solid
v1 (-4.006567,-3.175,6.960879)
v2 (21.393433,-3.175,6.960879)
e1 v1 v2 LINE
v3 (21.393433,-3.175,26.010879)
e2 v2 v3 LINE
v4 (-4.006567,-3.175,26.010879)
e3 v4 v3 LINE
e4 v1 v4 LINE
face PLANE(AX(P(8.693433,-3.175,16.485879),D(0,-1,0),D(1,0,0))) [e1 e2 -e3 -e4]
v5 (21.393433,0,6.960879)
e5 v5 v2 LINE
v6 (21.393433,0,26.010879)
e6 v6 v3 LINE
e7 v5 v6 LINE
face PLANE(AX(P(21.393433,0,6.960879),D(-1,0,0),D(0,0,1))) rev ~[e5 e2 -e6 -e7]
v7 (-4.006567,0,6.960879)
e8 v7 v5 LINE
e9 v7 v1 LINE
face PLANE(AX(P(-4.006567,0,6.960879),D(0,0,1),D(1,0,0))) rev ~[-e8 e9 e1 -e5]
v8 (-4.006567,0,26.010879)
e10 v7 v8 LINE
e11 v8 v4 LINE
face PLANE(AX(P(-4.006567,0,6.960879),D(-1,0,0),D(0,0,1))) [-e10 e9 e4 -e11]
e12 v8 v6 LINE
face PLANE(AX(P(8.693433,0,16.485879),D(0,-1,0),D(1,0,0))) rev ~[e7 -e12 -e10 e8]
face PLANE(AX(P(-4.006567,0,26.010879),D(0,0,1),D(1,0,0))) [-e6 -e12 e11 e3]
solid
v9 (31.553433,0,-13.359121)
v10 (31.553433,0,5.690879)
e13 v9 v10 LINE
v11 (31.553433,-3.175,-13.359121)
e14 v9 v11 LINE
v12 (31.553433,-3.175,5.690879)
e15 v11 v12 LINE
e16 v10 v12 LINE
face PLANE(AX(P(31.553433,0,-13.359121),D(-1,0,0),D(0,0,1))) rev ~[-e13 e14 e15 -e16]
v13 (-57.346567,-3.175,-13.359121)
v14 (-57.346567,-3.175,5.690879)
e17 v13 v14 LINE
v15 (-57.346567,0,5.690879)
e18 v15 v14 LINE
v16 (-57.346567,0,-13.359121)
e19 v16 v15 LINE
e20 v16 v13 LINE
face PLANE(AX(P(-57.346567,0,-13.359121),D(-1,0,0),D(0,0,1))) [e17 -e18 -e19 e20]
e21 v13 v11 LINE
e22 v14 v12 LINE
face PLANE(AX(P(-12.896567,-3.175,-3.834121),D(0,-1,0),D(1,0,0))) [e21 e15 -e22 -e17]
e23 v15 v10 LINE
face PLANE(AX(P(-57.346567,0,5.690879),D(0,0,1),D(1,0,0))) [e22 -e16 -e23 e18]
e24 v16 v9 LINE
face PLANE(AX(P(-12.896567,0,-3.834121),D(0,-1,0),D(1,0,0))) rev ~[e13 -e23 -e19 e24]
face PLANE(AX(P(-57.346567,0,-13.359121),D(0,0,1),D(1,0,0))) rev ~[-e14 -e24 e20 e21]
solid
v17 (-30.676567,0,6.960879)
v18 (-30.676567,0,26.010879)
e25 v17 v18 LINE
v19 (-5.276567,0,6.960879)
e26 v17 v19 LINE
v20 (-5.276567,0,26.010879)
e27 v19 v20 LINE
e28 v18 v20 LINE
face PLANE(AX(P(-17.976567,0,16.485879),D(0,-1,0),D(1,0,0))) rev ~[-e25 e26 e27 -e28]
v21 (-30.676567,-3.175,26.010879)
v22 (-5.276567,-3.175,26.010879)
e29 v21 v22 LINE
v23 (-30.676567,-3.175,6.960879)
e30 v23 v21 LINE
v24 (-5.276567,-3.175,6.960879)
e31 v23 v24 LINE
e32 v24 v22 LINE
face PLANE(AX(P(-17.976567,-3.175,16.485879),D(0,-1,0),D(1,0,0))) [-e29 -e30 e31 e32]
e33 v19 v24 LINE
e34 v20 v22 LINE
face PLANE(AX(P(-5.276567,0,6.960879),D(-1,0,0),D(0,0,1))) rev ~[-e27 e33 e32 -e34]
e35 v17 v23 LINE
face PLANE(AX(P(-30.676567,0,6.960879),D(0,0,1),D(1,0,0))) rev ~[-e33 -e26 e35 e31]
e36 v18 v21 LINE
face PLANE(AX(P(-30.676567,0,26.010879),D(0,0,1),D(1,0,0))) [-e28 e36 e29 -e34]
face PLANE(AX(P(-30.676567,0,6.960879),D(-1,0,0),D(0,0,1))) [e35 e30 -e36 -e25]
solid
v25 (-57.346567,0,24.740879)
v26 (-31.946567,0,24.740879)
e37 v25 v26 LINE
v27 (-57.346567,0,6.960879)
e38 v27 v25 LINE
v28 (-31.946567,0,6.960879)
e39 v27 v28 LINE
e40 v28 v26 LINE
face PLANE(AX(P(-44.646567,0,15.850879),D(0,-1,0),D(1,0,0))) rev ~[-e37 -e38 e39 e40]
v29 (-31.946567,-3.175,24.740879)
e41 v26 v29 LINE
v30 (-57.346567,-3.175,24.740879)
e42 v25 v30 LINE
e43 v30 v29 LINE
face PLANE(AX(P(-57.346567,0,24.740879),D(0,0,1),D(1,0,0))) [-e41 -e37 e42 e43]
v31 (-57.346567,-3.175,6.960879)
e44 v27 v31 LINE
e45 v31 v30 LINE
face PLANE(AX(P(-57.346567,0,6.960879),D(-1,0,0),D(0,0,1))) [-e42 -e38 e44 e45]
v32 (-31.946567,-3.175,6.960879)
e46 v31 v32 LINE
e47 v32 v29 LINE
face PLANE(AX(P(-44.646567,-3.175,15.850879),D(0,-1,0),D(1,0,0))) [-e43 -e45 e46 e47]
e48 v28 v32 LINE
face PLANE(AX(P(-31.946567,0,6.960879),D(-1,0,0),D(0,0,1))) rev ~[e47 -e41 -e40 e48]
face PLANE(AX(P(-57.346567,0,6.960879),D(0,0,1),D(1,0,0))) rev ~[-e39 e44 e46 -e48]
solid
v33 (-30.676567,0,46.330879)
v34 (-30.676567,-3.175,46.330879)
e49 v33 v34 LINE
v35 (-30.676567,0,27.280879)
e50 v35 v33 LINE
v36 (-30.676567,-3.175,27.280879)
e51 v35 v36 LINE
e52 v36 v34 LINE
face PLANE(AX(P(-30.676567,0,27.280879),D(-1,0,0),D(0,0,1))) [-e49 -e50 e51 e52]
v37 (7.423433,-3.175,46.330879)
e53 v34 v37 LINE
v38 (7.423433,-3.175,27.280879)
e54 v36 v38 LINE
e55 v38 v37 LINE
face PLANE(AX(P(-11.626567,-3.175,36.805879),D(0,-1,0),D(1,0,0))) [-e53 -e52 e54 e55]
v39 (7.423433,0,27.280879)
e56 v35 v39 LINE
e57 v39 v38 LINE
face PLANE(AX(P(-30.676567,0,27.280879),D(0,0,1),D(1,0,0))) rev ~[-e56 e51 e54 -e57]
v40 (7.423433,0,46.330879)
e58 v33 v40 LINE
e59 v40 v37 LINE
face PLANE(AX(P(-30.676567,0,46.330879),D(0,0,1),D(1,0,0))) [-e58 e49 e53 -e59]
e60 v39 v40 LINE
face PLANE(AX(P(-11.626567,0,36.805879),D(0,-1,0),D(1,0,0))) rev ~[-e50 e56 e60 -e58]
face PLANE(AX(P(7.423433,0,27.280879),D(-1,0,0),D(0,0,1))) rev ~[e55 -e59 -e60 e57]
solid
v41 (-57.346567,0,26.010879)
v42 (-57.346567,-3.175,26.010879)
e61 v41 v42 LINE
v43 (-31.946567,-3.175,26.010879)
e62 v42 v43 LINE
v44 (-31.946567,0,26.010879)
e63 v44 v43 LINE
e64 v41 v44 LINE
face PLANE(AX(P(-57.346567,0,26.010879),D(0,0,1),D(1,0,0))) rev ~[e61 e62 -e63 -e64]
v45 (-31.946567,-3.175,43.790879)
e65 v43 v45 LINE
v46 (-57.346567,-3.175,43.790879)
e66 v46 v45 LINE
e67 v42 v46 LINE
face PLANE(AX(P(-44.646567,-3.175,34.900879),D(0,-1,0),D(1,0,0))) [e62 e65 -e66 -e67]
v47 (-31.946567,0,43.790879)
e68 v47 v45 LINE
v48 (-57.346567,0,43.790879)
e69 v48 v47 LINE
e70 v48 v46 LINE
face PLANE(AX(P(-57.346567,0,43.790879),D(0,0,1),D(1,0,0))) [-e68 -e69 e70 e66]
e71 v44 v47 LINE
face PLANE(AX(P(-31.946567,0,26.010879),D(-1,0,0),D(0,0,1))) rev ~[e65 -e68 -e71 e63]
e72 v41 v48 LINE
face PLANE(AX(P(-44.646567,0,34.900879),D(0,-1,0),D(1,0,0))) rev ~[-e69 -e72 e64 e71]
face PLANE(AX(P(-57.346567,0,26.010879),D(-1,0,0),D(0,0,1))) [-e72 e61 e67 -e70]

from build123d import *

# Parameters (mm, degrees)
F0_W     = 25.4
F0_H     = 17.78
F1_DEPTH = 3.175
F0_W_2   = 38.1
F0_H_2   = 19.05
F0_W_3   = 88.9


# Not quite as in the source:
# - a length typed as a fraction of an inch, garbled in the dataset ("3 / 203.2 mm" for 3/8 in), is restored


with BuildPart() as f1:
    # F0 (on Front) → F1 (new body)
    with BuildSketch(Plane.XZ):
        with Locations((-44.6465671939, 34.900879418)):
            Rectangle(F0_W, F0_H)
    extrude(amount=F1_DEPTH)


with BuildPart() as f1b:
    # F0 (on Front) → F1, piece 2 (new body)
    with BuildSketch(Plane.XZ):
        with Locations((-11.6265671939, 36.805879418)):
            Rectangle(F0_W_2, F0_H_2)
    extrude(amount=F1_DEPTH)


with BuildPart() as f1c:
    # F0 (on Front) → F1, piece 3 (new body)
    with BuildSketch(Plane.XZ):
        with Locations((-17.9765671939, 16.485879418)):
            Rectangle(F0_W, F0_H_2)
    extrude(amount=F1_DEPTH)


with BuildPart() as f1d:
    # F0 (on Front) → F1, piece 4 (new body)
    with BuildSketch(Plane.XZ):
        with Locations((-44.6465671939, 15.850879418)):
            Rectangle(F0_W, F0_H)
    extrude(amount=F1_DEPTH)


with BuildPart() as f1e:
    # F0 (on Front) → F1, piece 5 (new body)
    with BuildSketch(Plane.XZ):
        with Locations((-12.8965671939, -3.834120582)):
            Rectangle(F0_W_3, F0_H_2)
    extrude(amount=F1_DEPTH)


with BuildPart() as f1f:
    # F0 (on Front) → F1, piece 6 (new body)
    with BuildSketch(Plane.XZ):
        with Locations((8.6934328061, 16.485879418)):
            Rectangle(F0_W, F0_H_2)
    extrude(amount=F1_DEPTH)


solid = Compound([f1.part, f1b.part, f1c.part, f1d.part, f1e.part, f1f.part])
